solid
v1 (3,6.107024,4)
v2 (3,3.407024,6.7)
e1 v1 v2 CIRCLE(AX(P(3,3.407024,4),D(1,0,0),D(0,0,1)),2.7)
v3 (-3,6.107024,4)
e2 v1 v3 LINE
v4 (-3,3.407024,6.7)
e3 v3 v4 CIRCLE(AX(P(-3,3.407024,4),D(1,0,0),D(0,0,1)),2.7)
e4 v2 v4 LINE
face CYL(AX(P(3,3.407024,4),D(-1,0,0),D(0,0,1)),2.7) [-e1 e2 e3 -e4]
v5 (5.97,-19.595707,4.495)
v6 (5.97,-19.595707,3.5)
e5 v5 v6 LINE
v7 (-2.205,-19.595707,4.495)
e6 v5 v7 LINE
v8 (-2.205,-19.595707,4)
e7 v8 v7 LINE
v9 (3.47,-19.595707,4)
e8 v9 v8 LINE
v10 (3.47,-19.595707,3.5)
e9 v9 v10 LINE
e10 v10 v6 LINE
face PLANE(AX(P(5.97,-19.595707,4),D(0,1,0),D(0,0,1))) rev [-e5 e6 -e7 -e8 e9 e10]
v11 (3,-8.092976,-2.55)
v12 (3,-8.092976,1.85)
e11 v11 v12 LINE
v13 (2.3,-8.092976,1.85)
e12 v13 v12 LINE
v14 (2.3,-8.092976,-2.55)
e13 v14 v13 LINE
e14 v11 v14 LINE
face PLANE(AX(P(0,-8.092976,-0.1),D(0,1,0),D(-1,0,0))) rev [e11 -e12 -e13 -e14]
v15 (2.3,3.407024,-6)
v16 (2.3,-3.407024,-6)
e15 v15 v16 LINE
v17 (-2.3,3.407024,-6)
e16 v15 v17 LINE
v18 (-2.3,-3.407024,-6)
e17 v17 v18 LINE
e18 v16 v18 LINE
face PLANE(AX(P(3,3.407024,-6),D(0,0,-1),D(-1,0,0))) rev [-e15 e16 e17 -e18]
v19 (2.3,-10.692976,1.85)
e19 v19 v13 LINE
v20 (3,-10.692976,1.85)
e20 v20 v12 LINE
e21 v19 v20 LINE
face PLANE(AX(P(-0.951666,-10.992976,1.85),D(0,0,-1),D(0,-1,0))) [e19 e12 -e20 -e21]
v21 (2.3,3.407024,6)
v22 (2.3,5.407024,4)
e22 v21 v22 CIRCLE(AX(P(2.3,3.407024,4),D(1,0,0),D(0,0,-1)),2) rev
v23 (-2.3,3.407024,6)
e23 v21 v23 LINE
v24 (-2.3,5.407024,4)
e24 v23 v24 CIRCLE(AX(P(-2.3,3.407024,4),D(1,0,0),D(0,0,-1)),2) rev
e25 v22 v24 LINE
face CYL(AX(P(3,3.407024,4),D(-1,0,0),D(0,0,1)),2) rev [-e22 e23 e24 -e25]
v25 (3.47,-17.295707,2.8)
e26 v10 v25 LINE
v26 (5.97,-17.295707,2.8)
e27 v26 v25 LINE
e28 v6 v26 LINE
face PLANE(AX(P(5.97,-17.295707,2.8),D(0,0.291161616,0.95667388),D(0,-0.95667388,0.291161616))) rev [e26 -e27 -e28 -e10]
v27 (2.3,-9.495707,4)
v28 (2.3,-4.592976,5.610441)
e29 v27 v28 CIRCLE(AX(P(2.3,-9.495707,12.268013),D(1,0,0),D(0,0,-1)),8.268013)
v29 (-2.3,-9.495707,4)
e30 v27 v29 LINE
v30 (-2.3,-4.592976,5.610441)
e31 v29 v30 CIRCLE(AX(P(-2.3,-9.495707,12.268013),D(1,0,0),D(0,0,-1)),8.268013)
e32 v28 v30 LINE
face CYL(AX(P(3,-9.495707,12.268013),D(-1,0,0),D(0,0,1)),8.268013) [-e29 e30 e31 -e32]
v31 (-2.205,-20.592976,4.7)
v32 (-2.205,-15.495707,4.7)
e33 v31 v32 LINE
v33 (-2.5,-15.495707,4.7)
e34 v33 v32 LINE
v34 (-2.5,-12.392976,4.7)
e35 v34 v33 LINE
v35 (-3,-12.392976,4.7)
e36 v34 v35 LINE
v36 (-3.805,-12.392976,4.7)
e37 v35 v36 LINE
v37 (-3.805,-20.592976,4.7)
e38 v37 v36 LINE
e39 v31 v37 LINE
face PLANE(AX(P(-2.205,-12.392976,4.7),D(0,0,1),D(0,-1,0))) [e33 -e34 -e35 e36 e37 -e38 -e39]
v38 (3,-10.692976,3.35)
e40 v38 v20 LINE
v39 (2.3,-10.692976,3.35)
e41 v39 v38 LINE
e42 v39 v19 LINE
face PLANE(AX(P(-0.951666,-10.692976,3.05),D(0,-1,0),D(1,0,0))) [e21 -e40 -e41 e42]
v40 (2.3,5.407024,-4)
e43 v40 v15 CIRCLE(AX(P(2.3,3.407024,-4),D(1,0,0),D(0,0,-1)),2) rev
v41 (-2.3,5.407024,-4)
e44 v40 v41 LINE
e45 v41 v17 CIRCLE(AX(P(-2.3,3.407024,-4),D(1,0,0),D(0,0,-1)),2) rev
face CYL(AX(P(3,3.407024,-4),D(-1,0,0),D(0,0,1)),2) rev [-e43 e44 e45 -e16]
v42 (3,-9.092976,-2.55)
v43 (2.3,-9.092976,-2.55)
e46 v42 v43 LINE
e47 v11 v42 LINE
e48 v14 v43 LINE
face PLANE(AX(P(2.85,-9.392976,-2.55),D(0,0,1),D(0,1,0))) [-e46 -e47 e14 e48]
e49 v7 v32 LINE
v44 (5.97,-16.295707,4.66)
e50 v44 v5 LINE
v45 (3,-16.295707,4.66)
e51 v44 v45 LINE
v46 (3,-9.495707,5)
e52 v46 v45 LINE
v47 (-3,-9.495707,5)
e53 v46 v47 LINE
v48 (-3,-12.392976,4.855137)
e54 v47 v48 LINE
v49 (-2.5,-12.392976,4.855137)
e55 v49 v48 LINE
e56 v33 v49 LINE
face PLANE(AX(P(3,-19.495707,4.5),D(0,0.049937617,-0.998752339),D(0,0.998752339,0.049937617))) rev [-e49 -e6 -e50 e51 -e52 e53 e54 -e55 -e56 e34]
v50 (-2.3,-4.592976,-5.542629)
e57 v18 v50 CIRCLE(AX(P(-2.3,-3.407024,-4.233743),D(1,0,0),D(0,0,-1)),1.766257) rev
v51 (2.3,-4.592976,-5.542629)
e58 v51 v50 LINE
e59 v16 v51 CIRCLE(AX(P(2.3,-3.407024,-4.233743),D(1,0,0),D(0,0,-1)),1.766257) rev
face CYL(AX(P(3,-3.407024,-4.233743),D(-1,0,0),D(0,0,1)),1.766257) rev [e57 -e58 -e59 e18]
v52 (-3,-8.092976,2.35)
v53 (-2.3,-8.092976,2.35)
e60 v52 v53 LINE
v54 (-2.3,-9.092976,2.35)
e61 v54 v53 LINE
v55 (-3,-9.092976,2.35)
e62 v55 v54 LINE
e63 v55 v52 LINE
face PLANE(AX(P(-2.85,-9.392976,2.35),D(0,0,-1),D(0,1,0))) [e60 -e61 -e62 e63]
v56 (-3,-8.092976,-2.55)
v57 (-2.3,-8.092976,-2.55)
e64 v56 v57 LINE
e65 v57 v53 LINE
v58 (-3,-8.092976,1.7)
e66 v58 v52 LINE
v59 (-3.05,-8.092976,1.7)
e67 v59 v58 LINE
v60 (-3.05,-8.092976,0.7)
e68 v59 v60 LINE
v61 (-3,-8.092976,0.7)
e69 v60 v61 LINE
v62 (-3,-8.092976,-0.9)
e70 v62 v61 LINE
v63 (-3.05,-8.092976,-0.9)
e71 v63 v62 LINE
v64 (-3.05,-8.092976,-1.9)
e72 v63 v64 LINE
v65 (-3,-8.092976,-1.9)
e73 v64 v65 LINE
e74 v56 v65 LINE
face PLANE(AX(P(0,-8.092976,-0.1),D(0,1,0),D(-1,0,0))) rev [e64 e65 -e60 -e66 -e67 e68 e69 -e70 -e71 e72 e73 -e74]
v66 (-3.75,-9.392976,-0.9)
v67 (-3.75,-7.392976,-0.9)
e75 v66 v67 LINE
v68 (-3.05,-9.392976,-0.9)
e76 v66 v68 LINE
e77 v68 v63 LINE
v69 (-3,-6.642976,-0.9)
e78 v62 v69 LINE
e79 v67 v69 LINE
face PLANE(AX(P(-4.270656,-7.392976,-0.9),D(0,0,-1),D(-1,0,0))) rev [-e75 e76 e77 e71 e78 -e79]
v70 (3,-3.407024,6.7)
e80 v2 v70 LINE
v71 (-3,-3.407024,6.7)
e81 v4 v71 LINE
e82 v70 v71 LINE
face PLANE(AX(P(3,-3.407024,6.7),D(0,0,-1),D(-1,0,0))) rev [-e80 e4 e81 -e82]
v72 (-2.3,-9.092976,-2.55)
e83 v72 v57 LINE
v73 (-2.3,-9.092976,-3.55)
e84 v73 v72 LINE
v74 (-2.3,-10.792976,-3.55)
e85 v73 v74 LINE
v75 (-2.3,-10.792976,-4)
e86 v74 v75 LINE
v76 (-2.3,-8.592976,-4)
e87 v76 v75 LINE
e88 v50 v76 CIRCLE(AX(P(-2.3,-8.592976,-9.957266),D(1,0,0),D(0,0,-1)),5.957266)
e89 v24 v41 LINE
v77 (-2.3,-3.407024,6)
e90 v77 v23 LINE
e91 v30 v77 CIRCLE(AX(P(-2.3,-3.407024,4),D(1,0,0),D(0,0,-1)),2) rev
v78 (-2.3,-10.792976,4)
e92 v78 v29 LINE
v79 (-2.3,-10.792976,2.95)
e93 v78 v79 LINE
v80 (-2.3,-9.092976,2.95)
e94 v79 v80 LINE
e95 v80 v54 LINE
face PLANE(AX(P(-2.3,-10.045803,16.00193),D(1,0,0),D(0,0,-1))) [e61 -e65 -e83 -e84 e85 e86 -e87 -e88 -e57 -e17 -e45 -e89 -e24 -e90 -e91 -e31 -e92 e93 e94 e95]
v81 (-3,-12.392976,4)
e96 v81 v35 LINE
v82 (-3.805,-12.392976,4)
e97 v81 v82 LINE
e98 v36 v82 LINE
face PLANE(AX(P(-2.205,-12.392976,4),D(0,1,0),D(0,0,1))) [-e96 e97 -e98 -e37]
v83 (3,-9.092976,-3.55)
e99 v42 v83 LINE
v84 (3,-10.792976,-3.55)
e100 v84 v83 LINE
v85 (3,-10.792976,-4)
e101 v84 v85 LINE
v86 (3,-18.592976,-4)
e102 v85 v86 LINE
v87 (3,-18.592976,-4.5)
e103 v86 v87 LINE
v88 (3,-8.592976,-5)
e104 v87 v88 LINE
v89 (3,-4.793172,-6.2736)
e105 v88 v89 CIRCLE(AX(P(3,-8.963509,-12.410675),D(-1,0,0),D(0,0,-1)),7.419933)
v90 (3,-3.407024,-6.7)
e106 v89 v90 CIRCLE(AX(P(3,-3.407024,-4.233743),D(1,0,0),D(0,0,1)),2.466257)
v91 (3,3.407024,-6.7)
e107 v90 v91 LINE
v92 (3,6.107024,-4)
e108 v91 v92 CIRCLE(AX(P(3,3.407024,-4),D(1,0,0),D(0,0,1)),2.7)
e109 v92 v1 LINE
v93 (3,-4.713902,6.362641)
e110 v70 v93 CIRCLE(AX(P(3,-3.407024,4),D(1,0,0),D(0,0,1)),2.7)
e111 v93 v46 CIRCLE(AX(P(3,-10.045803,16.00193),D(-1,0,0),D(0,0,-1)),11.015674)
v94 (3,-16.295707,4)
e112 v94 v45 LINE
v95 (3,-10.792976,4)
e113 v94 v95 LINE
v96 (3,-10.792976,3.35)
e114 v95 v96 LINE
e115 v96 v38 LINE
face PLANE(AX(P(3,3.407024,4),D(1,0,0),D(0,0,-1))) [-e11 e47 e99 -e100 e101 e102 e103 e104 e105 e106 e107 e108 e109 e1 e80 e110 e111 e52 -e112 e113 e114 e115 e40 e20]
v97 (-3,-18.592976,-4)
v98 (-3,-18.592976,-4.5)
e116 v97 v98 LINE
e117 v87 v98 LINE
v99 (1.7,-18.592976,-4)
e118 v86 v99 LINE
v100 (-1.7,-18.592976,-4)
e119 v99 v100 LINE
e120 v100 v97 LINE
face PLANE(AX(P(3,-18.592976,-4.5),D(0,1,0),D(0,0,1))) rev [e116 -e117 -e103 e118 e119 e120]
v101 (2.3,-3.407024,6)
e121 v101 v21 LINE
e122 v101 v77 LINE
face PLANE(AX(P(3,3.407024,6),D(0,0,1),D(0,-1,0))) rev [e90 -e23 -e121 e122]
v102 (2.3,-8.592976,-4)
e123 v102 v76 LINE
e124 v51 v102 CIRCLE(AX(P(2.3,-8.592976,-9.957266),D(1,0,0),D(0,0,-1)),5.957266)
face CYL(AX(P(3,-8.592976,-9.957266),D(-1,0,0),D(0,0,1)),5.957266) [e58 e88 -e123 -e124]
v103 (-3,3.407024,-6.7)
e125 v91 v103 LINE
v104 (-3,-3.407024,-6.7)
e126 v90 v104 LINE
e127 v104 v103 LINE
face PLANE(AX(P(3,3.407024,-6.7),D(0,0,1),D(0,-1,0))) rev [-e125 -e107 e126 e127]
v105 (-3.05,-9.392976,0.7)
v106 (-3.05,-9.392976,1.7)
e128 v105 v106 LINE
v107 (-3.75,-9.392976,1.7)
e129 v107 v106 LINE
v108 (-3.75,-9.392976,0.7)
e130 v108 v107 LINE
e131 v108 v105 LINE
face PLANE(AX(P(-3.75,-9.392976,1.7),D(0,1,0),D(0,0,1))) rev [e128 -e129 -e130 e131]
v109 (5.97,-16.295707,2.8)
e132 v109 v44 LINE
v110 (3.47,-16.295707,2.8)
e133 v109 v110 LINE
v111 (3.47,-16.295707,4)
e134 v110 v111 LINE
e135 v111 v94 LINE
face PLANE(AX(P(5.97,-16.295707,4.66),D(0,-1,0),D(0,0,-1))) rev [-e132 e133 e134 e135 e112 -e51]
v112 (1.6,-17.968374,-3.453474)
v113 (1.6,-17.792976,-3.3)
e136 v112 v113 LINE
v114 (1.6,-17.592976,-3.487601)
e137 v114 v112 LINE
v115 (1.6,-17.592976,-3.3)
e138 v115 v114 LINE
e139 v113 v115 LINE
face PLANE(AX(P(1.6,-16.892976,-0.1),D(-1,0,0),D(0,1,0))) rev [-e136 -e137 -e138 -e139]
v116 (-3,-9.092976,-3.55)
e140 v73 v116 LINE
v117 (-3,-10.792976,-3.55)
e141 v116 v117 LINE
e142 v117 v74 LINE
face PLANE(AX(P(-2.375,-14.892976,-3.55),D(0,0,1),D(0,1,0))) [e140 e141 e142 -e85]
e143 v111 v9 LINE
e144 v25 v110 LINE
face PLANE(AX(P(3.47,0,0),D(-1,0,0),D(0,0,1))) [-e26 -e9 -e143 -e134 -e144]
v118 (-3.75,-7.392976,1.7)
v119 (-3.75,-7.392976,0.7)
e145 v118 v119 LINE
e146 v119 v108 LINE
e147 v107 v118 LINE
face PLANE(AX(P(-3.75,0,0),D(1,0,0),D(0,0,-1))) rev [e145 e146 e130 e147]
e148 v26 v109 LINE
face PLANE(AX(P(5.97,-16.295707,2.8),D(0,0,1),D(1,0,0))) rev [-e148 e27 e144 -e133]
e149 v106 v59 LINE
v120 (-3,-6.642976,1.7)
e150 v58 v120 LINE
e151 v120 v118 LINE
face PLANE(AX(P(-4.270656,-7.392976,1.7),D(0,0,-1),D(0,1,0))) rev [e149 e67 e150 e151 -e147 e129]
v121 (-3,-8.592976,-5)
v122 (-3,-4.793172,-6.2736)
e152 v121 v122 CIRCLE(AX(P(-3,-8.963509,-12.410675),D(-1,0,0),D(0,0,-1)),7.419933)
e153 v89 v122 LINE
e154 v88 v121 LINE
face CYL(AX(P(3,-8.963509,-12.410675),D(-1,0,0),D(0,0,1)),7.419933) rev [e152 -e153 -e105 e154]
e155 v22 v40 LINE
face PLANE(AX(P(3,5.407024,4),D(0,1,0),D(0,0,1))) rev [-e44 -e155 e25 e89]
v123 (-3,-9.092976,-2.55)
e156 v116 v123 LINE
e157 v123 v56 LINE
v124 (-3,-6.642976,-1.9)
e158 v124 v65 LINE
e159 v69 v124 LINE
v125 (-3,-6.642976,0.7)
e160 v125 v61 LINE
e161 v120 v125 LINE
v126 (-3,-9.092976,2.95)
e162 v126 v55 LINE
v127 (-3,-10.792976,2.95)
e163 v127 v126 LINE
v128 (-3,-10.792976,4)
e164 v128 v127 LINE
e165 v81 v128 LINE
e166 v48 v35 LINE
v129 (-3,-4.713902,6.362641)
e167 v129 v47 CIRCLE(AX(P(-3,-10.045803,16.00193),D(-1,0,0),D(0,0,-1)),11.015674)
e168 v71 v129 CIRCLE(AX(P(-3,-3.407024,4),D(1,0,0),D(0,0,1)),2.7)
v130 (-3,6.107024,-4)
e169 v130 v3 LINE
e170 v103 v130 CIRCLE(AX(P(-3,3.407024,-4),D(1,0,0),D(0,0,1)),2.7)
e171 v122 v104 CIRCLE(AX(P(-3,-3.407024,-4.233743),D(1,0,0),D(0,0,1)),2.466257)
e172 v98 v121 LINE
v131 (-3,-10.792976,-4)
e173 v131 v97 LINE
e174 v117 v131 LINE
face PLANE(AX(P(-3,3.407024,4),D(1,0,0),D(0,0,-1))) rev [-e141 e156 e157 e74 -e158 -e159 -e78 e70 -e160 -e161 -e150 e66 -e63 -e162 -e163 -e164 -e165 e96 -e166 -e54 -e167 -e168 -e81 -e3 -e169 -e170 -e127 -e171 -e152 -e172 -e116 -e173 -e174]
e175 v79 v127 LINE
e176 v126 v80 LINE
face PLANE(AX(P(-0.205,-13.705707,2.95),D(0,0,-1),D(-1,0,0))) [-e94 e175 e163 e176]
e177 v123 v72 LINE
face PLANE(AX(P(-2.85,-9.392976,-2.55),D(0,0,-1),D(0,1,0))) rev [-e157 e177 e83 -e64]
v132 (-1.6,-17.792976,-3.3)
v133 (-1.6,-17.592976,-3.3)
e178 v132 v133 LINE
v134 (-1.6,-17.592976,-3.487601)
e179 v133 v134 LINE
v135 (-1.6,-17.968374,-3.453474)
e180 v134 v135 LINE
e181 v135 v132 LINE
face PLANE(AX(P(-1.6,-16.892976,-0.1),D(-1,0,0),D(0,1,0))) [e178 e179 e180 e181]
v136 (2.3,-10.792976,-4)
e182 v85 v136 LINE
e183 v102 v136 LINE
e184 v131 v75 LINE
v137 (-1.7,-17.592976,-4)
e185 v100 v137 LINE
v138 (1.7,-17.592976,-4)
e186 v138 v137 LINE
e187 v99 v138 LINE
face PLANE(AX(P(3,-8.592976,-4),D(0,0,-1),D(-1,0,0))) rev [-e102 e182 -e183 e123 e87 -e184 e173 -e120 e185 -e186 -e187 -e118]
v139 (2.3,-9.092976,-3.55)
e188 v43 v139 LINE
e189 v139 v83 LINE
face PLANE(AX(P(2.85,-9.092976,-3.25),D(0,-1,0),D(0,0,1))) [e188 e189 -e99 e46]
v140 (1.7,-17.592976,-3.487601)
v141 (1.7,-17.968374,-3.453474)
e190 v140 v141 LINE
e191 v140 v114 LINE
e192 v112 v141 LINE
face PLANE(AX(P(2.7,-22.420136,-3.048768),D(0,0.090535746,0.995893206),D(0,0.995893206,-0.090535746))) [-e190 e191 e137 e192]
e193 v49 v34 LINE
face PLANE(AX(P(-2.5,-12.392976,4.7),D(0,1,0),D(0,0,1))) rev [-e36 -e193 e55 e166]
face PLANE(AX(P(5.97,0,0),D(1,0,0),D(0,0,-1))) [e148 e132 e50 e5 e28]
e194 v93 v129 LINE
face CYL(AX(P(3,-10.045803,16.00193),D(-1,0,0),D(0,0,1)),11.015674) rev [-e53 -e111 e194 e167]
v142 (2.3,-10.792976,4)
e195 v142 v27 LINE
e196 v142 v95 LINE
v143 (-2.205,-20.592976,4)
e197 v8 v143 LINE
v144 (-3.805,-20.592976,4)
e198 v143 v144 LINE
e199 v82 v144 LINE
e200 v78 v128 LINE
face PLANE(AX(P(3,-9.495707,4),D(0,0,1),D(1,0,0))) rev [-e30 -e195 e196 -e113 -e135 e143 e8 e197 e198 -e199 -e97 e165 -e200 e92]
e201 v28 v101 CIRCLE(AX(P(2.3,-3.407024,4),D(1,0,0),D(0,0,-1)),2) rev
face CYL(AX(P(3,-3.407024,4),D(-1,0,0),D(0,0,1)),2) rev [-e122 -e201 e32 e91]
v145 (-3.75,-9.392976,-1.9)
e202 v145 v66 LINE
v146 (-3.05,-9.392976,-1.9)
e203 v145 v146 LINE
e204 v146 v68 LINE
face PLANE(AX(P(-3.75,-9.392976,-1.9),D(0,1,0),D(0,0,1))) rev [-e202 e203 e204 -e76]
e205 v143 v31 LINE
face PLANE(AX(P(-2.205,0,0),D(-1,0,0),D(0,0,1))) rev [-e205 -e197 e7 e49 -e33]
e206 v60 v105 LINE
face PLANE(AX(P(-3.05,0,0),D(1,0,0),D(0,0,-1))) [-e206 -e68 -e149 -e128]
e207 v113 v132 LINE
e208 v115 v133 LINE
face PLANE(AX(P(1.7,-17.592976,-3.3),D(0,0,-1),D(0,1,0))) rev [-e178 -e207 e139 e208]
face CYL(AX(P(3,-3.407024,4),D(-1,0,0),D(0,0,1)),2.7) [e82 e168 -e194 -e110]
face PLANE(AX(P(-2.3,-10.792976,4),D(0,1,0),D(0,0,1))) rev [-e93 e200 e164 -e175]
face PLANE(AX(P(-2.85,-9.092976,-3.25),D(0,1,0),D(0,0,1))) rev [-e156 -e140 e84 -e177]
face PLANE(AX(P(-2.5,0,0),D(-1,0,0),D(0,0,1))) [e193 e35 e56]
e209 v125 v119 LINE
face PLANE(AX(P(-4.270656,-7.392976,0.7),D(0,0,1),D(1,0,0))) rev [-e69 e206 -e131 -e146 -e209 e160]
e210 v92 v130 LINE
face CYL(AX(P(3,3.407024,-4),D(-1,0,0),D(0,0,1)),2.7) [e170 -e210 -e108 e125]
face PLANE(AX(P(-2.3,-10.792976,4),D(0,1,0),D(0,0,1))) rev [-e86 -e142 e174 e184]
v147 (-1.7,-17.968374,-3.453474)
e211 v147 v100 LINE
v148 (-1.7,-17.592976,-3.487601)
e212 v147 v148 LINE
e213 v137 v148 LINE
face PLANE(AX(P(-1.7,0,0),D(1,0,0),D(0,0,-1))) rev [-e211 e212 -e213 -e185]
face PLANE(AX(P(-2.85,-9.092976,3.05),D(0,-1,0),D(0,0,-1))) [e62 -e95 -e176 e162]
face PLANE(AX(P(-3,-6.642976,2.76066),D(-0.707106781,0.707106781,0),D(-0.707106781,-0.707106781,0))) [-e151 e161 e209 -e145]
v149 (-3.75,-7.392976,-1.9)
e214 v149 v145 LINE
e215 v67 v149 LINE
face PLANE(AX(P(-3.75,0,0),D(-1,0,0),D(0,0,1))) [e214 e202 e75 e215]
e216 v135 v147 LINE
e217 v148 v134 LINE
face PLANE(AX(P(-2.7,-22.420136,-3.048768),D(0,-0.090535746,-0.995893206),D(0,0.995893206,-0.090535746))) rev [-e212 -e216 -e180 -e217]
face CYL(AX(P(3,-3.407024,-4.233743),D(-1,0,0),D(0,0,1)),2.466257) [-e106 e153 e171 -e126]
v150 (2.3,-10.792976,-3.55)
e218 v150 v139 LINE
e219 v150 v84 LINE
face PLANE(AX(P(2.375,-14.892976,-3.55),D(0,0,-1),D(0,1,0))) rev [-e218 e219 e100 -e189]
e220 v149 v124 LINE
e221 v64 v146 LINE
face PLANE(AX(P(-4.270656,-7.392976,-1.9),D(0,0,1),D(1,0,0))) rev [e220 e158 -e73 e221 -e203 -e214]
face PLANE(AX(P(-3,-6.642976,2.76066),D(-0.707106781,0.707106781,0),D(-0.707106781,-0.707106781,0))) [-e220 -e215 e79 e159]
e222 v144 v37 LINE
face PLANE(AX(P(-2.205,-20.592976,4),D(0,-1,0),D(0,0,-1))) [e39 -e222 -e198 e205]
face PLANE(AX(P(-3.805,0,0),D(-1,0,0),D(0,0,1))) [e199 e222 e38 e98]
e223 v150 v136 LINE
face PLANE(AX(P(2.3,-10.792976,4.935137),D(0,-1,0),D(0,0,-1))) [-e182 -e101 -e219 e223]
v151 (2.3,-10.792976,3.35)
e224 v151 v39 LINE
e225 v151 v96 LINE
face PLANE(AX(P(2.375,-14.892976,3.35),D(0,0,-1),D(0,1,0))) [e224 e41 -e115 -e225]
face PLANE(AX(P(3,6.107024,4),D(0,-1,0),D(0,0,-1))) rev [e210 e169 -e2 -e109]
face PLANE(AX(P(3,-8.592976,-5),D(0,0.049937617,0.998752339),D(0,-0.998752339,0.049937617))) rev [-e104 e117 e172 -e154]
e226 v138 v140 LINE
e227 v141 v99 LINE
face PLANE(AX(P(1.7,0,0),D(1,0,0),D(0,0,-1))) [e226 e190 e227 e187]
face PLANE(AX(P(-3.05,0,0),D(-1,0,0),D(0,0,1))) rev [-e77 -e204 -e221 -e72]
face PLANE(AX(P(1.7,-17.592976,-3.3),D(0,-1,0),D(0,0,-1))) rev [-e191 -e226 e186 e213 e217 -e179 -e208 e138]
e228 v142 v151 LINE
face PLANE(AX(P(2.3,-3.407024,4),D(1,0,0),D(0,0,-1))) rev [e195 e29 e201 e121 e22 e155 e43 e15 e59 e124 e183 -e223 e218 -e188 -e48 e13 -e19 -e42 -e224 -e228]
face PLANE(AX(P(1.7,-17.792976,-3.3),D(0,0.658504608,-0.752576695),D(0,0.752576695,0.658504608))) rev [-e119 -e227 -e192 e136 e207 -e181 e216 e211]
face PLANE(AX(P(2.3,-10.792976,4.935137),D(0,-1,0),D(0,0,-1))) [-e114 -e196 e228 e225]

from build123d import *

# Parameters (mm, degrees)
BOSS_EXTRUDE1_DEPTH      = 3
BOSS_EXTRUDE2_DEPTH      = 0.7
BOSS_EXTRUDE3_START      = -5.3
BOSS_EXTRUDE3_DEPTH      = 0.7
BOSS_EXTRUDE4_DEPTH      = 1.7
BOSS_EXTRUDE5_DEPTH      = 2.97
BOSS_EXTRUDE6_DEPTH      = 2.5
BOSS_EXTRUDE7_DEPTH      = 0.805
BOSS_EXTRUDE7_DEPTH_BACK = 0.795
SKETCH7_W                = 0.7
SKETCH7_H                = 8.2
CUT_EXTRUDE2_DEPTH       = 0.5
CUT_EXTRUDE3_DEPTH       = 23.844830336
BOSS_EXTRUDE8_DEPTH      = 5.205
INDENT1_START            = -3
INDENT1_DEPTH            = 6
INDENT1_2_DEPTH          = 1.4
INDENT1_START_2          = 1.6
INDENT1_3_OUTLINE_W      = 0.1
INDENT1_3_OUTLINE_H      = 0.4
INDENT1_3_DEPTH          = 1.4
BOSS_EXTRUDE11_START     = 0.05
SKETCH14_W               = 1
SKETCH14_H               = 2
BOSS_EXTRUDE11_DEPTH     = 0.7
BOSS_EXTRUDE11_2_DEPTH   = 0.7
SKETCH15_W               = 1
SKETCH15_H               = 0.7
BOSS_EXTRUDE12_DEPTH     = 0.05
BOSS_EXTRUDE13_REACH     = 25.101
CUT_EXTRUDE4_REACH       = 18.211
SKETCH17_W               = 0.75
SKETCH17_H               = 1.6


# Read off the part's stored shape, not the designer's step: Indent1
with BuildPart() as part:
    # Sketch1 → Boss-Extrude1 (new, symmetric)
    with BuildSketch(Plane(origin=(0, 0, 0), x_dir=(0, 0, -1), z_dir=(1, 0, 0))):
        with BuildLine():
            Line((-4, 5.407024303), (4, 5.407024303))
            ThreePointArc((4, 5.407024303), (5.414213562, 4.821237865), (6, 3.407024303))
            Line((6, 3.407024303), (6, -3.407024303))
            ThreePointArc((6, -3.407024303), (5.881695242, -4.042569102), (5.54262919, -4.592975697))
            ThreePointArc((5.54262919, -4.592975697), (4.399020595, -6.449397799), (4, -8.592975697))
            Line((4, -8.592975697), (4, -18.592975697))
            Line((4, -18.592975697), (4.5, -18.592975697))
            Line((4.5, -18.592975697), (5, -8.592975697))
            ThreePointArc((5, -8.592975697), (5.375406184, -6.605461118), (6.273600288, -4.793172135))
            ThreePointArc((6.273600288, -4.793172135), (6.590990962, -4.132148866), (6.7, -3.407024303))
            Line((6.7, -3.407024303), (6.7, 3.407024303))
            ThreePointArc((6.7, 3.407024303), (5.909188309, 5.316212612), (4, 6.107024303))
            Line((4, 6.107024303), (-4, 6.107024303))
            ThreePointArc((-4, 6.107024303), (-5.909188309, 5.316212612), (-6.7, 3.407024303))
            Line((-6.7, 3.407024303), (-6.7, -3.407024303))
            ThreePointArc((-6.7, -3.407024303), (-6.614300123, -4.08188345), (-6.362640838, -4.7139016))
            ThreePointArc((-6.362640838, -4.7139016), (-5.407997914, -7.026917179), (-5, -9.495706737))
            Line((-5, -9.495706737), (-4.5, -19.495706737))
            Line((-4.5, -19.495706737), (-4, -19.495706737))
            Line((-4, -19.495706737), (-4, -9.495706737))
            ThreePointArc((-4, -9.495706737), (-4.412921237, -6.915479473), (-5.610440713, -4.592975697))
            ThreePointArc((-5.610440713, -4.592975697), (-5.900115974, -4.03117115), (-6, -3.407024303))
            Line((-6, -3.407024303), (-6, 3.407024303))
            ThreePointArc((-6, 3.407024303), (-5.414213562, 4.821237865), (-4, 5.407024303))
        make_face()
    extrude(amount=BOSS_EXTRUDE1_DEPTH, both=True)

    # Sketch2 → Boss-Extrude2 (add)
    with BuildSketch(Plane(origin=(3, 0, 0), x_dir=(0, 0, -1), z_dir=(1, 0, 0))):
        with BuildLine():
            Line((5, -8.592975697), (4.89, -10.792975697))
            Line((4.89, -10.792975697), (-4.935136552, -10.792975697))
            Line((-4.935136552, -10.792975697), (-5, -9.495706737))
            ThreePointArc((-5, -9.495706737), (-5.407997914, -7.026917179), (-6.362640838, -4.7139016))
            ThreePointArc((-6.362640838, -4.7139016), (-6.614300123, -4.08188345), (-6.7, -3.407024303))
            Line((-6.7, -3.407024303), (-6.7, 3.407024303))
            ThreePointArc((-6.7, 3.407024303), (-5.909188309, 5.316212612), (-4, 6.107024303))
            Line((-4, 6.107024303), (4, 6.107024303))
            ThreePointArc((4, 6.107024303), (5.909188309, 5.316212612), (6.7, 3.407024303))
            Line((6.7, 3.407024303), (6.7, -3.407024303))
            ThreePointArc((6.7, -3.407024303), (6.590990962, -4.132148866), (6.273600288, -4.793172135))
            ThreePointArc((6.273600288, -4.793172135), (5.375406184, -6.605461118), (5, -8.592975697))
        make_face()
    extrude(amount=-BOSS_EXTRUDE2_DEPTH)

    # Sketch2<2> → Boss-Extrude3 (add)
    with BuildSketch(Plane(origin=(3, 0, 0), x_dir=(0, 0, -1), z_dir=(1, 0, 0)).offset(BOSS_EXTRUDE3_START)):
        with BuildLine():
            Line((4.89, -10.792975697), (5, -8.592975697))
            ThreePointArc((5, -8.592975697), (5.375406184, -6.605461118), (6.273600288, -4.793172135))
            ThreePointArc((6.273600288, -4.793172135), (6.590990962, -4.132148866), (6.7, -3.407024303))
            Line((6.7, -3.407024303), (6.7, 3.407024303))
            ThreePointArc((6.7, 3.407024303), (5.909188309, 5.316212612), (4, 6.107024303))
            Line((4, 6.107024303), (-4, 6.107024303))
            ThreePointArc((-4, 6.107024303), (-5.909188309, 5.316212612), (-6.7, 3.407024303))
            Line((-6.7, 3.407024303), (-6.7, -3.407024303))
            ThreePointArc((-6.7, -3.407024303), (-6.614300123, -4.08188345), (-6.362640838, -4.7139016))
            ThreePointArc((-6.362640838, -4.7139016), (-5.407997914, -7.026917179), (-5, -9.495706737))
            Line((-5, -9.495706737), (-4.935136552, -10.792975697))
            Line((-4.935136552, -10.792975697), (-4, -10.792975697))
            Line((-4, -10.792975697), (-4, -9.495706737))
            ThreePointArc((-4, -9.495706737), (-4.412921237, -6.915479473), (-5.610440713, -4.592975697))
            ThreePointArc((-5.610440713, -4.592975697), (-5.900115974, -4.03117115), (-6, -3.407024303))
            Line((-6, -3.407024303), (-6, 3.407024303))
            ThreePointArc((-6, 3.407024303), (-5.414213562, 4.821237865), (-4, 5.407024303))
            Line((-4, 5.407024303), (4, 5.407024303))
            ThreePointArc((4, 5.407024303), (5.414213562, 4.821237865), (6, 3.407024303))
            Line((6, 3.407024303), (6, -3.407024303))
            ThreePointArc((6, -3.407024303), (5.881695242, -4.042569102), (5.54262919, -4.592975697))
            ThreePointArc((5.54262919, -4.592975697), (4.399020595, -6.449397799), (4, -8.592975697))
            Line((4, -8.592975697), (4, -10.792975697))
            Line((4, -10.792975697), (4.89, -10.792975697))
        make_face()
        Polygon((4.5, -18.592975697), (4.89, -10.792975697), (4, -10.792975697), (4, -18.592975697), align=None)
        with BuildLine():
            Line((-4, -10.792975697), (4, -10.792975697))
            Line((4, -10.792975697), (4, -8.592975697))
            ThreePointArc((4, -8.592975697), (4.399020595, -6.449397799), (5.54262919, -4.592975697))
            ThreePointArc((5.54262919, -4.592975697), (5.881695242, -4.042569102), (6, -3.407024303))
            Line((6, -3.407024303), (6, 3.407024303))
            ThreePointArc((6, 3.407024303), (5.414213562, 4.821237865), (4, 5.407024303))
            Line((4, 5.407024303), (-4, 5.407024303))
            ThreePointArc((-4, 5.407024303), (-5.414213562, 4.821237865), (-6, 3.407024303))
            Line((-6, 3.407024303), (-6, -3.407024303))
            ThreePointArc((-6, -3.407024303), (-5.900115974, -4.03117115), (-5.610440713, -4.592975697))
            ThreePointArc((-5.610440713, -4.592975697), (-4.412921237, -6.915479473), (-4, -9.495706737))
            Line((-4, -9.495706737), (-4, -10.792975697))
        make_face()
        Polygon((-4, -19.495706737), (-4, -10.792975697), (-4.935136552, -10.792975697), (-4.5, -19.495706737), align=None)
    extrude(amount=-BOSS_EXTRUDE3_DEPTH)

    # Sketch4 → Boss-Extrude4 (add, symmetric)
    with BuildSketch(Plane(origin=(0, 0, 0), x_dir=(0, 0, -1), z_dir=(1, 0, 0))):
        Polygon((3.3, -17.592975697), (4, -17.592975697), (4, -18.592975697), (3.3, -17.792975697), align=None)
    extrude(amount=BOSS_EXTRUDE4_DEPTH, both=True)

    # Sketch5 → Boss-Extrude5 (add)
    with BuildSketch(Plane(origin=(3, 0, 0), x_dir=(0, 0, -1), z_dir=(1, 0, 0))):
        Polygon((-4.495, -19.595706737), (-4.66, -16.295706737), (-4, -16.295706737), (-4, -19.595706737), align=None)
    extrude(amount=BOSS_EXTRUDE5_DEPTH)

    # Sketch6 → Boss-Extrude6 (add)
    with BuildSketch(Plane(origin=(5.97, 0, 0), x_dir=(0, 0, -1), z_dir=(1, 0, 0))):
        Polygon((-4.66, -16.295706737), (-1.51, -16.295706737), (-1.51, -17.795706737), (-3.5, -19.595706737), (-4.495, -19.595706737), align=None)
    extrude(amount=-BOSS_EXTRUDE6_DEPTH)

    # Sketch7 → Boss-Extrude7 (add, two sides: drawn at the far end of the back side and taken through both)
    with BuildSketch(Plane.ZY.offset(3).offset(-BOSS_EXTRUDE7_DEPTH_BACK)):
        with Locations((4.35, -16.492975697)):
            Rectangle(SKETCH7_W, SKETCH7_H)
    extrude(amount=BOSS_EXTRUDE7_DEPTH + BOSS_EXTRUDE7_DEPTH_BACK)

    # Sketch8 → Cut-Extrude2 (cut)
    with BuildSketch(Plane.ZY.offset(3)):
        Polygon((4.7, -15.495706737), (4.7, -12.392975697), (4.855136552, -12.392975697), align=None)
    extrude(amount=-CUT_EXTRUDE2_DEPTH, mode=Mode.SUBTRACT)

    # Sketch9 → Cut-Extrude3 (cut, through all)
    with BuildSketch(Plane.ZY.offset(-3.47)):
        Polygon((2.8, -16.295706737), (1.51, -16.295706737), (1.51, -17.795706737), (3.5, -19.595706737), (2.8, -17.295706737), align=None)
    extrude(amount=-CUT_EXTRUDE3_DEPTH, mode=Mode.SUBTRACT)

    # Sketch10 → Boss-Extrude8 (add)
    with BuildSketch(Plane.ZY.offset(-3)):
        Polygon((4.495, -19.595706737), (4.5, -19.495706737), (4, -19.495706737), (4, -19.595706737), align=None)
    extrude(amount=BOSS_EXTRUDE8_DEPTH)

    # Indent1 outline → Indent1 (cut)
    with BuildSketch(Plane.YZ.offset(INDENT1_START)):
        Polygon((-8.092975697, -2.55), (-8.092975697, 1.85), (-10.692975697, 1.85), (-10.692975697, 2.95), (-10.792975697, 2.95), (-10.792975697, -3.55), (-9.092975697, -3.55), (-9.092975697, -2.55), align=None)
    extrude(amount=INDENT1_DEPTH, mode=Mode.SUBTRACT)

    # Indent1 2 outline → Indent1 2 (cut)
    with BuildSketch(Plane.YZ.offset(INDENT1_START)):
        Polygon((-17.792975697, -3.3), (-17.968374126, -3.453473625), (-17.592975697, -3.487600755), (-17.592975697, -3.3), align=None)
        Polygon((-8.092975697, 2.35), (-9.092975697, 2.35), (-9.092975697, 2.95), (-10.692975697, 2.95), (-10.692975697, 1.85), (-8.092975697, 1.85), align=None)
    extrude(amount=INDENT1_2_DEPTH, mode=Mode.SUBTRACT)

    # Indent1 3 outline → Indent1 3 (cut)
    with BuildSketch(Plane.YZ.offset(INDENT1_START_2)):
        Polygon((-17.792975697, -3.3), (-17.968374126, -3.453473625), (-17.592975697, -3.487600755), (-17.592975697, -3.3), align=None)
        with Locations((-10.742975697, 3.15)):
            Rectangle(INDENT1_3_OUTLINE_W, INDENT1_3_OUTLINE_H)
    extrude(amount=INDENT1_3_DEPTH, mode=Mode.SUBTRACT)



with BuildPart() as body_2:
    # Sketch14 → Boss-Extrude11 (new body)
    with BuildSketch(Plane.ZY.offset(3).offset(BOSS_EXTRUDE11_START)):
        with Locations((1.2, -8.392975697)):
            Rectangle(SKETCH14_W, SKETCH14_H)
    extrude(amount=BOSS_EXTRUDE11_DEPTH)


with BuildPart() as body_3:
    # Sketch14 → Boss-Extrude11 2 (new body)
    with BuildSketch(Plane.ZY.offset(3).offset(BOSS_EXTRUDE11_START)):
        with Locations((-1.4, -8.392975697)):
            Rectangle(SKETCH14_W, SKETCH14_H)
    extrude(amount=BOSS_EXTRUDE11_2_DEPTH)


with BuildPart() as part_1:
    add(part.part)

    add(body_2.part)  # Boss-Extrude12 merges body 2

    add(body_3.part)  # Boss-Extrude12 merges body 3
    # Sketch15 → Boss-Extrude12 (add)
    with BuildSketch(Plane.ZY.offset(3)):
        with Locations((1.2, -7.742975697)):
            Rectangle(SKETCH15_W, SKETCH15_H)
        with Locations((-1.4, -7.742975697)):
            Rectangle(SKETCH15_W, SKETCH15_H)
    extrude(amount=BOSS_EXTRUDE12_DEPTH)

    # Boss-Extrude13: up to this face of the body (flat: up to its plane)
    boss_extrude13_end = Plane(part_1.part.faces().sort_by_distance((-3.390853659, -8.377122039, 1.7))[0])
    # Sketch16 → Boss-Extrude13 (add, up to the picked face)
    with BuildSketch(Plane(origin=(0, 0, -1.9), x_dir=(-1, 0, 0), z_dir=(0, 0, -1)), mode=Mode.PRIVATE) as boss_extrude13_sk1:
        Polygon((3, -7.392975697), (3, -6.642975697), (3.75, -7.392975697), align=None)
    boss_extrude13_tool1 = split(extrude(boss_extrude13_sk1.sketch, amount=-BOSS_EXTRUDE13_REACH, mode=Mode.PRIVATE), bisect_by=boss_extrude13_end, keep=Keep.BOTH, mode=Mode.PRIVATE)
    add(boss_extrude13_tool1.solids().sort_by(Axis((-3.25, -7.142976, -1.9), (0, 0, 1)))[0])

    # Cut-Extrude4: up to this face of the body (flat: up to its plane)
    cut_extrude4_end = Plane(part_1.part.faces().sort_by_distance((-3.375, -7.017975697, -0.1))[0])
    # Sketch17 → Cut-Extrude4 (cut, up to the picked face)
    with BuildSketch(Plane.XZ.offset(7.392975697), mode=Mode.PRIVATE) as cut_extrude4_sk1:
        with Locations((-3.375, -0.1)):
            Rectangle(SKETCH17_W, SKETCH17_H)
    cut_extrude4_tool1 = split(extrude(cut_extrude4_sk1.sketch, amount=-CUT_EXTRUDE4_REACH, mode=Mode.PRIVATE), bisect_by=cut_extrude4_end, keep=Keep.BOTH, mode=Mode.PRIVATE)
    add(cut_extrude4_tool1.solids().sort_by(Axis((-3.375, -7.392976, -0.1), (0, 1, 0)))[0], mode=Mode.SUBTRACT)


solid = part_1.part
